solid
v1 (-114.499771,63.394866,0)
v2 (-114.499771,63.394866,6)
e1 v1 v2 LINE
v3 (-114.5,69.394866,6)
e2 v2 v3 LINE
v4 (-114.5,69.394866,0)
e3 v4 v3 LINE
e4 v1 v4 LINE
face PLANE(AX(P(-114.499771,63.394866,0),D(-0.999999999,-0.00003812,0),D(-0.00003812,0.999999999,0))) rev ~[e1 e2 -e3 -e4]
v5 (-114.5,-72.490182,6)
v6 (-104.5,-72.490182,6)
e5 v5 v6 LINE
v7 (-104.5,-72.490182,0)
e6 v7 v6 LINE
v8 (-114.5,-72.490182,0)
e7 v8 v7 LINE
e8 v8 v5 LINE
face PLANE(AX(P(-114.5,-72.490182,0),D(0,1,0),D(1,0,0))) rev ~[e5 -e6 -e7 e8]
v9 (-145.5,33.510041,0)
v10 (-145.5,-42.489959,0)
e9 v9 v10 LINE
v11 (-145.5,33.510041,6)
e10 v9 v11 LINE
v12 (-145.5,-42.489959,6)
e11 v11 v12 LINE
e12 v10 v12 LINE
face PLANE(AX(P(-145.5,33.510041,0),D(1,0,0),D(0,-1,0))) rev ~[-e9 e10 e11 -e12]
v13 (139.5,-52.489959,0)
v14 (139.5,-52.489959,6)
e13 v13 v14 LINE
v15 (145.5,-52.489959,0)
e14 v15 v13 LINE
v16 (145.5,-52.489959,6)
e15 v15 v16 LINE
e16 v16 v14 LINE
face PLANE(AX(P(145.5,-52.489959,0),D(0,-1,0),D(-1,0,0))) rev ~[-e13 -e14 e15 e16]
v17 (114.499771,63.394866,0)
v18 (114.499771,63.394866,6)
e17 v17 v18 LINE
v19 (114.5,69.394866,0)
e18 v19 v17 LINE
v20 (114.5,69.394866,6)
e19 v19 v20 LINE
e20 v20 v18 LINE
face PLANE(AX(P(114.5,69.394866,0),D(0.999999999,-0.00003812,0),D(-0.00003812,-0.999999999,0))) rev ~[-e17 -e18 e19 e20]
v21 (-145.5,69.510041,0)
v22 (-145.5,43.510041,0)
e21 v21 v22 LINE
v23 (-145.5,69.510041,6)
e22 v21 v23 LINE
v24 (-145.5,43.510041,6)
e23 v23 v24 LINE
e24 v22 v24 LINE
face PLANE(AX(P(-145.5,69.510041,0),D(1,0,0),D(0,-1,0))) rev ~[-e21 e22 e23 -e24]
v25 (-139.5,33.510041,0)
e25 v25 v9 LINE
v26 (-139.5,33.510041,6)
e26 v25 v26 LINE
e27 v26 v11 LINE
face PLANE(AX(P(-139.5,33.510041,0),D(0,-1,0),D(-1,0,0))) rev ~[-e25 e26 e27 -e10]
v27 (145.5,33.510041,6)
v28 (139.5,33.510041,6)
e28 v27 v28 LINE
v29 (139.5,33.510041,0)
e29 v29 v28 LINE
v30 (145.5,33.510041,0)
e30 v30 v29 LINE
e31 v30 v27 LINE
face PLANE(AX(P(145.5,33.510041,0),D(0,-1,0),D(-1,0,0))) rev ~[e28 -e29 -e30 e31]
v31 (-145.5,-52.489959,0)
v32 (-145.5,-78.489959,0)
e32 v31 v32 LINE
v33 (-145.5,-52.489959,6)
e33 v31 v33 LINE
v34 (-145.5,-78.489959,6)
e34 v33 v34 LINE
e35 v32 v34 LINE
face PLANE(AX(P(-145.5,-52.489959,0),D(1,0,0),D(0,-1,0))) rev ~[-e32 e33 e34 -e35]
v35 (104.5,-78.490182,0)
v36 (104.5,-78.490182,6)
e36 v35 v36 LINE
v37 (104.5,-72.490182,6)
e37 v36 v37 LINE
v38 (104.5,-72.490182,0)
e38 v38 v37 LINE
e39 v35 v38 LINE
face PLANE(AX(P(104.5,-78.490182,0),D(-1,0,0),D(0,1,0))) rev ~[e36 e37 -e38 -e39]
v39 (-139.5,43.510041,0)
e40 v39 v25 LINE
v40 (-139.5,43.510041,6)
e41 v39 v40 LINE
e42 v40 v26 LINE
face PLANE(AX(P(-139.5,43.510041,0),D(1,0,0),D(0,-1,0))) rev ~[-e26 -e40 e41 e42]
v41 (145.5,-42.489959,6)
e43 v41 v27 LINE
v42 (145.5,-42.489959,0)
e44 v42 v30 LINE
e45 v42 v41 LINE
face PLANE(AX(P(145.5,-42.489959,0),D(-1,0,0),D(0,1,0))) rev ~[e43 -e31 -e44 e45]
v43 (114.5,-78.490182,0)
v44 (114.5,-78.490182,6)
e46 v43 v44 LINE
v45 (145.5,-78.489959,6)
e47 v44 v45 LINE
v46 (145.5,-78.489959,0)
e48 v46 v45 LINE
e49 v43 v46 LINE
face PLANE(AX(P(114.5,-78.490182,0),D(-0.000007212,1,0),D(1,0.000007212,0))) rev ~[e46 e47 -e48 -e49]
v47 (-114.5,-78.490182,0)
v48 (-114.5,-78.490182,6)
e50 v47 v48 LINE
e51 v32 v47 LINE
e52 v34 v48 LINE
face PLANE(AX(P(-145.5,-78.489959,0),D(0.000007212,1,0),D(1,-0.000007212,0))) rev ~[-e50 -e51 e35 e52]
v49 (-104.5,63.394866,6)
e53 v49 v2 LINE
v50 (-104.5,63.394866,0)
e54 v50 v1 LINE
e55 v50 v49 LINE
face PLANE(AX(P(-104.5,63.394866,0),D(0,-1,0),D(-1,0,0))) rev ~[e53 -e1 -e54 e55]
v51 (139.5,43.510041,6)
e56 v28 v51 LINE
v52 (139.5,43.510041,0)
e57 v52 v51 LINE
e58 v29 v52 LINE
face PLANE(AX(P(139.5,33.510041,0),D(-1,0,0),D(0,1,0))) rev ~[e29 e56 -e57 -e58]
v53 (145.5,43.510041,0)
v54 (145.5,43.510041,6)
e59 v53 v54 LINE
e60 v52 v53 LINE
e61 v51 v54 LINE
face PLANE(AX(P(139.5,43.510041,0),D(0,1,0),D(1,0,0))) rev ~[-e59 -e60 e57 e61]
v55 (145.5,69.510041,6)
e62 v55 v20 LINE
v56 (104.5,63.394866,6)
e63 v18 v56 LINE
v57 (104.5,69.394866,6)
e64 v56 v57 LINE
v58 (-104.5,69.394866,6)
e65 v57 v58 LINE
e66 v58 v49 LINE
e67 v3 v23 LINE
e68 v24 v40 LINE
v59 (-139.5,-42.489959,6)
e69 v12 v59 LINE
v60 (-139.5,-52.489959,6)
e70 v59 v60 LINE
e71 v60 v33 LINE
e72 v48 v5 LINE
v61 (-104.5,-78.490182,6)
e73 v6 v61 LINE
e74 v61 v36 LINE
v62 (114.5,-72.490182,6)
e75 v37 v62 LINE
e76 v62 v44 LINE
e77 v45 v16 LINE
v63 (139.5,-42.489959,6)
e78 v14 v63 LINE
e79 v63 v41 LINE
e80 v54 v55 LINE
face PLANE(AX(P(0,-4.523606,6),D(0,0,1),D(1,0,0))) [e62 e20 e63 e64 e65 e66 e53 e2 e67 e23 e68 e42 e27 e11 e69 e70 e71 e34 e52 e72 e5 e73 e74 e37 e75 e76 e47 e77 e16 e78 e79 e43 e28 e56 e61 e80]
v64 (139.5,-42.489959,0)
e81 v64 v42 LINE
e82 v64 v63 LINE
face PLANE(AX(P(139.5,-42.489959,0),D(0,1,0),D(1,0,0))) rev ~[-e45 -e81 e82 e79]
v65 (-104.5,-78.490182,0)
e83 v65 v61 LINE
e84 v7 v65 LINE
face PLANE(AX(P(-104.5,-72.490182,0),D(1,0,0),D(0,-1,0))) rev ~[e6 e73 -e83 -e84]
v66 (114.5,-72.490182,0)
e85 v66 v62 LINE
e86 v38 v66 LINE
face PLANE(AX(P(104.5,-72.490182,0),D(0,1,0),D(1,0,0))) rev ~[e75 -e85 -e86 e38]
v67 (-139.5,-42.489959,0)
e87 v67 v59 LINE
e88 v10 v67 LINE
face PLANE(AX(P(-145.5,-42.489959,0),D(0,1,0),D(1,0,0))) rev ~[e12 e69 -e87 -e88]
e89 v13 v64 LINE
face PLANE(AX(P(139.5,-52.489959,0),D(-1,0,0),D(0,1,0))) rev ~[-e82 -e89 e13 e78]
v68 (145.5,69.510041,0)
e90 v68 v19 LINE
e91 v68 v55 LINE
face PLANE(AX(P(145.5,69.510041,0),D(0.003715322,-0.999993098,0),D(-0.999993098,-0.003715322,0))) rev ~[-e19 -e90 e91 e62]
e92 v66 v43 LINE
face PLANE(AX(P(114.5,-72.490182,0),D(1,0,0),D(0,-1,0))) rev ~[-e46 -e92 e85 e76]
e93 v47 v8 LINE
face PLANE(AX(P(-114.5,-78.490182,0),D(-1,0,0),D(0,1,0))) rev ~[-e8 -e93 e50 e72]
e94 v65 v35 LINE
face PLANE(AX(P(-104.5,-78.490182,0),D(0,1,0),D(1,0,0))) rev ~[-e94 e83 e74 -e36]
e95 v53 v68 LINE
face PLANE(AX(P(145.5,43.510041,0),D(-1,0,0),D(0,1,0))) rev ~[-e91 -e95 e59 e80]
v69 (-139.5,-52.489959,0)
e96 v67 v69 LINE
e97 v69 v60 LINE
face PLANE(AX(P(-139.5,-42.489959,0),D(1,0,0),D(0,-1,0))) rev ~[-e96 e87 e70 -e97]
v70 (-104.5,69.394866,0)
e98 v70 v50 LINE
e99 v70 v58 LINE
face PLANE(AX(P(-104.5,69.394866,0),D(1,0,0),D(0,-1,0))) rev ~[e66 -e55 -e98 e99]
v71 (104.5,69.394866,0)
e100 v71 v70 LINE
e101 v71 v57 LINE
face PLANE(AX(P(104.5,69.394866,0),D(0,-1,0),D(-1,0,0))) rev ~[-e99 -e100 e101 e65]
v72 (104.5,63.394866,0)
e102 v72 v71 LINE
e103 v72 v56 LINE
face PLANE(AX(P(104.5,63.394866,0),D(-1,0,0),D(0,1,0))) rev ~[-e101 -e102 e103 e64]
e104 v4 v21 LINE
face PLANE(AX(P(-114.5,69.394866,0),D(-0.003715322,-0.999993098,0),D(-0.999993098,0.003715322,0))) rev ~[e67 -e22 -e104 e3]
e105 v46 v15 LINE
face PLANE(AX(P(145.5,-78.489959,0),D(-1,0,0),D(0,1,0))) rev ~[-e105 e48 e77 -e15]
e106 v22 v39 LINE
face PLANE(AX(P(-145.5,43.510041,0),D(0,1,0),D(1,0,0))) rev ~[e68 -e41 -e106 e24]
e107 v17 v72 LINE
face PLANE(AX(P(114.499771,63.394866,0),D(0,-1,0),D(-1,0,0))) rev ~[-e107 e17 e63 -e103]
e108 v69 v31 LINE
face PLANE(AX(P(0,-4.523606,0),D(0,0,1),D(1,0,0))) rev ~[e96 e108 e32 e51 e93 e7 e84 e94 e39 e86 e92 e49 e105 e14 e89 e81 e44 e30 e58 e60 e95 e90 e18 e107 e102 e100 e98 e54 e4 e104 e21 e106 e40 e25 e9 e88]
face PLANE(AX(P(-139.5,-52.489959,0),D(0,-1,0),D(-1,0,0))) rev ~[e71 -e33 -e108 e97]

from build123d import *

# Parameters (mm, degrees)
F1_DEPTH = 6


# Not quite as in the source:
# - a feature names something its author has since deleted; it is built from what else it names


with BuildPart() as f1:
    # F0 (on Top) → F1 (new body)
    with BuildSketch(Plane.XY):
        Polygon((-145.5, 69.5100414706), (-145.5, 43.5100414706), (-139.5, 43.5100414706), (-139.5, 33.5100414706), (-145.5, 33.5100414706), (-145.5, -42.4899585294), (-139.5, -42.4899585294), (-139.5, -52.4899585294), (-145.5, -52.4899585294), (-145.5, -78.4899585294), (-114.5, -78.4901820861), (-114.5, -72.4901820861), (-104.5, -72.4901820861), (-104.5, -78.4901820861), (0, -78.4901820861), (104.5, -78.4901820861), (104.5, -72.4901820861), (114.5, -72.4901820861), (114.5, -78.4901820861), (145.5, -78.4899585294), (145.5, -52.4899585294), (139.5, -52.4899585294), (139.5, -42.4899585294), (145.5, -42.4899585294), (145.5, 33.5100414706), (139.5, 33.5100414706), (139.5, 43.5100414706), (145.5, 43.5100414706), (145.5, 69.5100414706), (114.5, 69.3948656799), (114.4997712807, 63.3948656843), (104.5, 63.3948656864), (104.5, 69.3948656864), (0, 69.3948656864), (-104.5, 69.3948656864), (-104.5, 63.3948656864), (-114.4997712807, 63.3948656843), (-114.5, 69.3948656799), align=None)
    extrude(amount=F1_DEPTH)


solid = f1.part
